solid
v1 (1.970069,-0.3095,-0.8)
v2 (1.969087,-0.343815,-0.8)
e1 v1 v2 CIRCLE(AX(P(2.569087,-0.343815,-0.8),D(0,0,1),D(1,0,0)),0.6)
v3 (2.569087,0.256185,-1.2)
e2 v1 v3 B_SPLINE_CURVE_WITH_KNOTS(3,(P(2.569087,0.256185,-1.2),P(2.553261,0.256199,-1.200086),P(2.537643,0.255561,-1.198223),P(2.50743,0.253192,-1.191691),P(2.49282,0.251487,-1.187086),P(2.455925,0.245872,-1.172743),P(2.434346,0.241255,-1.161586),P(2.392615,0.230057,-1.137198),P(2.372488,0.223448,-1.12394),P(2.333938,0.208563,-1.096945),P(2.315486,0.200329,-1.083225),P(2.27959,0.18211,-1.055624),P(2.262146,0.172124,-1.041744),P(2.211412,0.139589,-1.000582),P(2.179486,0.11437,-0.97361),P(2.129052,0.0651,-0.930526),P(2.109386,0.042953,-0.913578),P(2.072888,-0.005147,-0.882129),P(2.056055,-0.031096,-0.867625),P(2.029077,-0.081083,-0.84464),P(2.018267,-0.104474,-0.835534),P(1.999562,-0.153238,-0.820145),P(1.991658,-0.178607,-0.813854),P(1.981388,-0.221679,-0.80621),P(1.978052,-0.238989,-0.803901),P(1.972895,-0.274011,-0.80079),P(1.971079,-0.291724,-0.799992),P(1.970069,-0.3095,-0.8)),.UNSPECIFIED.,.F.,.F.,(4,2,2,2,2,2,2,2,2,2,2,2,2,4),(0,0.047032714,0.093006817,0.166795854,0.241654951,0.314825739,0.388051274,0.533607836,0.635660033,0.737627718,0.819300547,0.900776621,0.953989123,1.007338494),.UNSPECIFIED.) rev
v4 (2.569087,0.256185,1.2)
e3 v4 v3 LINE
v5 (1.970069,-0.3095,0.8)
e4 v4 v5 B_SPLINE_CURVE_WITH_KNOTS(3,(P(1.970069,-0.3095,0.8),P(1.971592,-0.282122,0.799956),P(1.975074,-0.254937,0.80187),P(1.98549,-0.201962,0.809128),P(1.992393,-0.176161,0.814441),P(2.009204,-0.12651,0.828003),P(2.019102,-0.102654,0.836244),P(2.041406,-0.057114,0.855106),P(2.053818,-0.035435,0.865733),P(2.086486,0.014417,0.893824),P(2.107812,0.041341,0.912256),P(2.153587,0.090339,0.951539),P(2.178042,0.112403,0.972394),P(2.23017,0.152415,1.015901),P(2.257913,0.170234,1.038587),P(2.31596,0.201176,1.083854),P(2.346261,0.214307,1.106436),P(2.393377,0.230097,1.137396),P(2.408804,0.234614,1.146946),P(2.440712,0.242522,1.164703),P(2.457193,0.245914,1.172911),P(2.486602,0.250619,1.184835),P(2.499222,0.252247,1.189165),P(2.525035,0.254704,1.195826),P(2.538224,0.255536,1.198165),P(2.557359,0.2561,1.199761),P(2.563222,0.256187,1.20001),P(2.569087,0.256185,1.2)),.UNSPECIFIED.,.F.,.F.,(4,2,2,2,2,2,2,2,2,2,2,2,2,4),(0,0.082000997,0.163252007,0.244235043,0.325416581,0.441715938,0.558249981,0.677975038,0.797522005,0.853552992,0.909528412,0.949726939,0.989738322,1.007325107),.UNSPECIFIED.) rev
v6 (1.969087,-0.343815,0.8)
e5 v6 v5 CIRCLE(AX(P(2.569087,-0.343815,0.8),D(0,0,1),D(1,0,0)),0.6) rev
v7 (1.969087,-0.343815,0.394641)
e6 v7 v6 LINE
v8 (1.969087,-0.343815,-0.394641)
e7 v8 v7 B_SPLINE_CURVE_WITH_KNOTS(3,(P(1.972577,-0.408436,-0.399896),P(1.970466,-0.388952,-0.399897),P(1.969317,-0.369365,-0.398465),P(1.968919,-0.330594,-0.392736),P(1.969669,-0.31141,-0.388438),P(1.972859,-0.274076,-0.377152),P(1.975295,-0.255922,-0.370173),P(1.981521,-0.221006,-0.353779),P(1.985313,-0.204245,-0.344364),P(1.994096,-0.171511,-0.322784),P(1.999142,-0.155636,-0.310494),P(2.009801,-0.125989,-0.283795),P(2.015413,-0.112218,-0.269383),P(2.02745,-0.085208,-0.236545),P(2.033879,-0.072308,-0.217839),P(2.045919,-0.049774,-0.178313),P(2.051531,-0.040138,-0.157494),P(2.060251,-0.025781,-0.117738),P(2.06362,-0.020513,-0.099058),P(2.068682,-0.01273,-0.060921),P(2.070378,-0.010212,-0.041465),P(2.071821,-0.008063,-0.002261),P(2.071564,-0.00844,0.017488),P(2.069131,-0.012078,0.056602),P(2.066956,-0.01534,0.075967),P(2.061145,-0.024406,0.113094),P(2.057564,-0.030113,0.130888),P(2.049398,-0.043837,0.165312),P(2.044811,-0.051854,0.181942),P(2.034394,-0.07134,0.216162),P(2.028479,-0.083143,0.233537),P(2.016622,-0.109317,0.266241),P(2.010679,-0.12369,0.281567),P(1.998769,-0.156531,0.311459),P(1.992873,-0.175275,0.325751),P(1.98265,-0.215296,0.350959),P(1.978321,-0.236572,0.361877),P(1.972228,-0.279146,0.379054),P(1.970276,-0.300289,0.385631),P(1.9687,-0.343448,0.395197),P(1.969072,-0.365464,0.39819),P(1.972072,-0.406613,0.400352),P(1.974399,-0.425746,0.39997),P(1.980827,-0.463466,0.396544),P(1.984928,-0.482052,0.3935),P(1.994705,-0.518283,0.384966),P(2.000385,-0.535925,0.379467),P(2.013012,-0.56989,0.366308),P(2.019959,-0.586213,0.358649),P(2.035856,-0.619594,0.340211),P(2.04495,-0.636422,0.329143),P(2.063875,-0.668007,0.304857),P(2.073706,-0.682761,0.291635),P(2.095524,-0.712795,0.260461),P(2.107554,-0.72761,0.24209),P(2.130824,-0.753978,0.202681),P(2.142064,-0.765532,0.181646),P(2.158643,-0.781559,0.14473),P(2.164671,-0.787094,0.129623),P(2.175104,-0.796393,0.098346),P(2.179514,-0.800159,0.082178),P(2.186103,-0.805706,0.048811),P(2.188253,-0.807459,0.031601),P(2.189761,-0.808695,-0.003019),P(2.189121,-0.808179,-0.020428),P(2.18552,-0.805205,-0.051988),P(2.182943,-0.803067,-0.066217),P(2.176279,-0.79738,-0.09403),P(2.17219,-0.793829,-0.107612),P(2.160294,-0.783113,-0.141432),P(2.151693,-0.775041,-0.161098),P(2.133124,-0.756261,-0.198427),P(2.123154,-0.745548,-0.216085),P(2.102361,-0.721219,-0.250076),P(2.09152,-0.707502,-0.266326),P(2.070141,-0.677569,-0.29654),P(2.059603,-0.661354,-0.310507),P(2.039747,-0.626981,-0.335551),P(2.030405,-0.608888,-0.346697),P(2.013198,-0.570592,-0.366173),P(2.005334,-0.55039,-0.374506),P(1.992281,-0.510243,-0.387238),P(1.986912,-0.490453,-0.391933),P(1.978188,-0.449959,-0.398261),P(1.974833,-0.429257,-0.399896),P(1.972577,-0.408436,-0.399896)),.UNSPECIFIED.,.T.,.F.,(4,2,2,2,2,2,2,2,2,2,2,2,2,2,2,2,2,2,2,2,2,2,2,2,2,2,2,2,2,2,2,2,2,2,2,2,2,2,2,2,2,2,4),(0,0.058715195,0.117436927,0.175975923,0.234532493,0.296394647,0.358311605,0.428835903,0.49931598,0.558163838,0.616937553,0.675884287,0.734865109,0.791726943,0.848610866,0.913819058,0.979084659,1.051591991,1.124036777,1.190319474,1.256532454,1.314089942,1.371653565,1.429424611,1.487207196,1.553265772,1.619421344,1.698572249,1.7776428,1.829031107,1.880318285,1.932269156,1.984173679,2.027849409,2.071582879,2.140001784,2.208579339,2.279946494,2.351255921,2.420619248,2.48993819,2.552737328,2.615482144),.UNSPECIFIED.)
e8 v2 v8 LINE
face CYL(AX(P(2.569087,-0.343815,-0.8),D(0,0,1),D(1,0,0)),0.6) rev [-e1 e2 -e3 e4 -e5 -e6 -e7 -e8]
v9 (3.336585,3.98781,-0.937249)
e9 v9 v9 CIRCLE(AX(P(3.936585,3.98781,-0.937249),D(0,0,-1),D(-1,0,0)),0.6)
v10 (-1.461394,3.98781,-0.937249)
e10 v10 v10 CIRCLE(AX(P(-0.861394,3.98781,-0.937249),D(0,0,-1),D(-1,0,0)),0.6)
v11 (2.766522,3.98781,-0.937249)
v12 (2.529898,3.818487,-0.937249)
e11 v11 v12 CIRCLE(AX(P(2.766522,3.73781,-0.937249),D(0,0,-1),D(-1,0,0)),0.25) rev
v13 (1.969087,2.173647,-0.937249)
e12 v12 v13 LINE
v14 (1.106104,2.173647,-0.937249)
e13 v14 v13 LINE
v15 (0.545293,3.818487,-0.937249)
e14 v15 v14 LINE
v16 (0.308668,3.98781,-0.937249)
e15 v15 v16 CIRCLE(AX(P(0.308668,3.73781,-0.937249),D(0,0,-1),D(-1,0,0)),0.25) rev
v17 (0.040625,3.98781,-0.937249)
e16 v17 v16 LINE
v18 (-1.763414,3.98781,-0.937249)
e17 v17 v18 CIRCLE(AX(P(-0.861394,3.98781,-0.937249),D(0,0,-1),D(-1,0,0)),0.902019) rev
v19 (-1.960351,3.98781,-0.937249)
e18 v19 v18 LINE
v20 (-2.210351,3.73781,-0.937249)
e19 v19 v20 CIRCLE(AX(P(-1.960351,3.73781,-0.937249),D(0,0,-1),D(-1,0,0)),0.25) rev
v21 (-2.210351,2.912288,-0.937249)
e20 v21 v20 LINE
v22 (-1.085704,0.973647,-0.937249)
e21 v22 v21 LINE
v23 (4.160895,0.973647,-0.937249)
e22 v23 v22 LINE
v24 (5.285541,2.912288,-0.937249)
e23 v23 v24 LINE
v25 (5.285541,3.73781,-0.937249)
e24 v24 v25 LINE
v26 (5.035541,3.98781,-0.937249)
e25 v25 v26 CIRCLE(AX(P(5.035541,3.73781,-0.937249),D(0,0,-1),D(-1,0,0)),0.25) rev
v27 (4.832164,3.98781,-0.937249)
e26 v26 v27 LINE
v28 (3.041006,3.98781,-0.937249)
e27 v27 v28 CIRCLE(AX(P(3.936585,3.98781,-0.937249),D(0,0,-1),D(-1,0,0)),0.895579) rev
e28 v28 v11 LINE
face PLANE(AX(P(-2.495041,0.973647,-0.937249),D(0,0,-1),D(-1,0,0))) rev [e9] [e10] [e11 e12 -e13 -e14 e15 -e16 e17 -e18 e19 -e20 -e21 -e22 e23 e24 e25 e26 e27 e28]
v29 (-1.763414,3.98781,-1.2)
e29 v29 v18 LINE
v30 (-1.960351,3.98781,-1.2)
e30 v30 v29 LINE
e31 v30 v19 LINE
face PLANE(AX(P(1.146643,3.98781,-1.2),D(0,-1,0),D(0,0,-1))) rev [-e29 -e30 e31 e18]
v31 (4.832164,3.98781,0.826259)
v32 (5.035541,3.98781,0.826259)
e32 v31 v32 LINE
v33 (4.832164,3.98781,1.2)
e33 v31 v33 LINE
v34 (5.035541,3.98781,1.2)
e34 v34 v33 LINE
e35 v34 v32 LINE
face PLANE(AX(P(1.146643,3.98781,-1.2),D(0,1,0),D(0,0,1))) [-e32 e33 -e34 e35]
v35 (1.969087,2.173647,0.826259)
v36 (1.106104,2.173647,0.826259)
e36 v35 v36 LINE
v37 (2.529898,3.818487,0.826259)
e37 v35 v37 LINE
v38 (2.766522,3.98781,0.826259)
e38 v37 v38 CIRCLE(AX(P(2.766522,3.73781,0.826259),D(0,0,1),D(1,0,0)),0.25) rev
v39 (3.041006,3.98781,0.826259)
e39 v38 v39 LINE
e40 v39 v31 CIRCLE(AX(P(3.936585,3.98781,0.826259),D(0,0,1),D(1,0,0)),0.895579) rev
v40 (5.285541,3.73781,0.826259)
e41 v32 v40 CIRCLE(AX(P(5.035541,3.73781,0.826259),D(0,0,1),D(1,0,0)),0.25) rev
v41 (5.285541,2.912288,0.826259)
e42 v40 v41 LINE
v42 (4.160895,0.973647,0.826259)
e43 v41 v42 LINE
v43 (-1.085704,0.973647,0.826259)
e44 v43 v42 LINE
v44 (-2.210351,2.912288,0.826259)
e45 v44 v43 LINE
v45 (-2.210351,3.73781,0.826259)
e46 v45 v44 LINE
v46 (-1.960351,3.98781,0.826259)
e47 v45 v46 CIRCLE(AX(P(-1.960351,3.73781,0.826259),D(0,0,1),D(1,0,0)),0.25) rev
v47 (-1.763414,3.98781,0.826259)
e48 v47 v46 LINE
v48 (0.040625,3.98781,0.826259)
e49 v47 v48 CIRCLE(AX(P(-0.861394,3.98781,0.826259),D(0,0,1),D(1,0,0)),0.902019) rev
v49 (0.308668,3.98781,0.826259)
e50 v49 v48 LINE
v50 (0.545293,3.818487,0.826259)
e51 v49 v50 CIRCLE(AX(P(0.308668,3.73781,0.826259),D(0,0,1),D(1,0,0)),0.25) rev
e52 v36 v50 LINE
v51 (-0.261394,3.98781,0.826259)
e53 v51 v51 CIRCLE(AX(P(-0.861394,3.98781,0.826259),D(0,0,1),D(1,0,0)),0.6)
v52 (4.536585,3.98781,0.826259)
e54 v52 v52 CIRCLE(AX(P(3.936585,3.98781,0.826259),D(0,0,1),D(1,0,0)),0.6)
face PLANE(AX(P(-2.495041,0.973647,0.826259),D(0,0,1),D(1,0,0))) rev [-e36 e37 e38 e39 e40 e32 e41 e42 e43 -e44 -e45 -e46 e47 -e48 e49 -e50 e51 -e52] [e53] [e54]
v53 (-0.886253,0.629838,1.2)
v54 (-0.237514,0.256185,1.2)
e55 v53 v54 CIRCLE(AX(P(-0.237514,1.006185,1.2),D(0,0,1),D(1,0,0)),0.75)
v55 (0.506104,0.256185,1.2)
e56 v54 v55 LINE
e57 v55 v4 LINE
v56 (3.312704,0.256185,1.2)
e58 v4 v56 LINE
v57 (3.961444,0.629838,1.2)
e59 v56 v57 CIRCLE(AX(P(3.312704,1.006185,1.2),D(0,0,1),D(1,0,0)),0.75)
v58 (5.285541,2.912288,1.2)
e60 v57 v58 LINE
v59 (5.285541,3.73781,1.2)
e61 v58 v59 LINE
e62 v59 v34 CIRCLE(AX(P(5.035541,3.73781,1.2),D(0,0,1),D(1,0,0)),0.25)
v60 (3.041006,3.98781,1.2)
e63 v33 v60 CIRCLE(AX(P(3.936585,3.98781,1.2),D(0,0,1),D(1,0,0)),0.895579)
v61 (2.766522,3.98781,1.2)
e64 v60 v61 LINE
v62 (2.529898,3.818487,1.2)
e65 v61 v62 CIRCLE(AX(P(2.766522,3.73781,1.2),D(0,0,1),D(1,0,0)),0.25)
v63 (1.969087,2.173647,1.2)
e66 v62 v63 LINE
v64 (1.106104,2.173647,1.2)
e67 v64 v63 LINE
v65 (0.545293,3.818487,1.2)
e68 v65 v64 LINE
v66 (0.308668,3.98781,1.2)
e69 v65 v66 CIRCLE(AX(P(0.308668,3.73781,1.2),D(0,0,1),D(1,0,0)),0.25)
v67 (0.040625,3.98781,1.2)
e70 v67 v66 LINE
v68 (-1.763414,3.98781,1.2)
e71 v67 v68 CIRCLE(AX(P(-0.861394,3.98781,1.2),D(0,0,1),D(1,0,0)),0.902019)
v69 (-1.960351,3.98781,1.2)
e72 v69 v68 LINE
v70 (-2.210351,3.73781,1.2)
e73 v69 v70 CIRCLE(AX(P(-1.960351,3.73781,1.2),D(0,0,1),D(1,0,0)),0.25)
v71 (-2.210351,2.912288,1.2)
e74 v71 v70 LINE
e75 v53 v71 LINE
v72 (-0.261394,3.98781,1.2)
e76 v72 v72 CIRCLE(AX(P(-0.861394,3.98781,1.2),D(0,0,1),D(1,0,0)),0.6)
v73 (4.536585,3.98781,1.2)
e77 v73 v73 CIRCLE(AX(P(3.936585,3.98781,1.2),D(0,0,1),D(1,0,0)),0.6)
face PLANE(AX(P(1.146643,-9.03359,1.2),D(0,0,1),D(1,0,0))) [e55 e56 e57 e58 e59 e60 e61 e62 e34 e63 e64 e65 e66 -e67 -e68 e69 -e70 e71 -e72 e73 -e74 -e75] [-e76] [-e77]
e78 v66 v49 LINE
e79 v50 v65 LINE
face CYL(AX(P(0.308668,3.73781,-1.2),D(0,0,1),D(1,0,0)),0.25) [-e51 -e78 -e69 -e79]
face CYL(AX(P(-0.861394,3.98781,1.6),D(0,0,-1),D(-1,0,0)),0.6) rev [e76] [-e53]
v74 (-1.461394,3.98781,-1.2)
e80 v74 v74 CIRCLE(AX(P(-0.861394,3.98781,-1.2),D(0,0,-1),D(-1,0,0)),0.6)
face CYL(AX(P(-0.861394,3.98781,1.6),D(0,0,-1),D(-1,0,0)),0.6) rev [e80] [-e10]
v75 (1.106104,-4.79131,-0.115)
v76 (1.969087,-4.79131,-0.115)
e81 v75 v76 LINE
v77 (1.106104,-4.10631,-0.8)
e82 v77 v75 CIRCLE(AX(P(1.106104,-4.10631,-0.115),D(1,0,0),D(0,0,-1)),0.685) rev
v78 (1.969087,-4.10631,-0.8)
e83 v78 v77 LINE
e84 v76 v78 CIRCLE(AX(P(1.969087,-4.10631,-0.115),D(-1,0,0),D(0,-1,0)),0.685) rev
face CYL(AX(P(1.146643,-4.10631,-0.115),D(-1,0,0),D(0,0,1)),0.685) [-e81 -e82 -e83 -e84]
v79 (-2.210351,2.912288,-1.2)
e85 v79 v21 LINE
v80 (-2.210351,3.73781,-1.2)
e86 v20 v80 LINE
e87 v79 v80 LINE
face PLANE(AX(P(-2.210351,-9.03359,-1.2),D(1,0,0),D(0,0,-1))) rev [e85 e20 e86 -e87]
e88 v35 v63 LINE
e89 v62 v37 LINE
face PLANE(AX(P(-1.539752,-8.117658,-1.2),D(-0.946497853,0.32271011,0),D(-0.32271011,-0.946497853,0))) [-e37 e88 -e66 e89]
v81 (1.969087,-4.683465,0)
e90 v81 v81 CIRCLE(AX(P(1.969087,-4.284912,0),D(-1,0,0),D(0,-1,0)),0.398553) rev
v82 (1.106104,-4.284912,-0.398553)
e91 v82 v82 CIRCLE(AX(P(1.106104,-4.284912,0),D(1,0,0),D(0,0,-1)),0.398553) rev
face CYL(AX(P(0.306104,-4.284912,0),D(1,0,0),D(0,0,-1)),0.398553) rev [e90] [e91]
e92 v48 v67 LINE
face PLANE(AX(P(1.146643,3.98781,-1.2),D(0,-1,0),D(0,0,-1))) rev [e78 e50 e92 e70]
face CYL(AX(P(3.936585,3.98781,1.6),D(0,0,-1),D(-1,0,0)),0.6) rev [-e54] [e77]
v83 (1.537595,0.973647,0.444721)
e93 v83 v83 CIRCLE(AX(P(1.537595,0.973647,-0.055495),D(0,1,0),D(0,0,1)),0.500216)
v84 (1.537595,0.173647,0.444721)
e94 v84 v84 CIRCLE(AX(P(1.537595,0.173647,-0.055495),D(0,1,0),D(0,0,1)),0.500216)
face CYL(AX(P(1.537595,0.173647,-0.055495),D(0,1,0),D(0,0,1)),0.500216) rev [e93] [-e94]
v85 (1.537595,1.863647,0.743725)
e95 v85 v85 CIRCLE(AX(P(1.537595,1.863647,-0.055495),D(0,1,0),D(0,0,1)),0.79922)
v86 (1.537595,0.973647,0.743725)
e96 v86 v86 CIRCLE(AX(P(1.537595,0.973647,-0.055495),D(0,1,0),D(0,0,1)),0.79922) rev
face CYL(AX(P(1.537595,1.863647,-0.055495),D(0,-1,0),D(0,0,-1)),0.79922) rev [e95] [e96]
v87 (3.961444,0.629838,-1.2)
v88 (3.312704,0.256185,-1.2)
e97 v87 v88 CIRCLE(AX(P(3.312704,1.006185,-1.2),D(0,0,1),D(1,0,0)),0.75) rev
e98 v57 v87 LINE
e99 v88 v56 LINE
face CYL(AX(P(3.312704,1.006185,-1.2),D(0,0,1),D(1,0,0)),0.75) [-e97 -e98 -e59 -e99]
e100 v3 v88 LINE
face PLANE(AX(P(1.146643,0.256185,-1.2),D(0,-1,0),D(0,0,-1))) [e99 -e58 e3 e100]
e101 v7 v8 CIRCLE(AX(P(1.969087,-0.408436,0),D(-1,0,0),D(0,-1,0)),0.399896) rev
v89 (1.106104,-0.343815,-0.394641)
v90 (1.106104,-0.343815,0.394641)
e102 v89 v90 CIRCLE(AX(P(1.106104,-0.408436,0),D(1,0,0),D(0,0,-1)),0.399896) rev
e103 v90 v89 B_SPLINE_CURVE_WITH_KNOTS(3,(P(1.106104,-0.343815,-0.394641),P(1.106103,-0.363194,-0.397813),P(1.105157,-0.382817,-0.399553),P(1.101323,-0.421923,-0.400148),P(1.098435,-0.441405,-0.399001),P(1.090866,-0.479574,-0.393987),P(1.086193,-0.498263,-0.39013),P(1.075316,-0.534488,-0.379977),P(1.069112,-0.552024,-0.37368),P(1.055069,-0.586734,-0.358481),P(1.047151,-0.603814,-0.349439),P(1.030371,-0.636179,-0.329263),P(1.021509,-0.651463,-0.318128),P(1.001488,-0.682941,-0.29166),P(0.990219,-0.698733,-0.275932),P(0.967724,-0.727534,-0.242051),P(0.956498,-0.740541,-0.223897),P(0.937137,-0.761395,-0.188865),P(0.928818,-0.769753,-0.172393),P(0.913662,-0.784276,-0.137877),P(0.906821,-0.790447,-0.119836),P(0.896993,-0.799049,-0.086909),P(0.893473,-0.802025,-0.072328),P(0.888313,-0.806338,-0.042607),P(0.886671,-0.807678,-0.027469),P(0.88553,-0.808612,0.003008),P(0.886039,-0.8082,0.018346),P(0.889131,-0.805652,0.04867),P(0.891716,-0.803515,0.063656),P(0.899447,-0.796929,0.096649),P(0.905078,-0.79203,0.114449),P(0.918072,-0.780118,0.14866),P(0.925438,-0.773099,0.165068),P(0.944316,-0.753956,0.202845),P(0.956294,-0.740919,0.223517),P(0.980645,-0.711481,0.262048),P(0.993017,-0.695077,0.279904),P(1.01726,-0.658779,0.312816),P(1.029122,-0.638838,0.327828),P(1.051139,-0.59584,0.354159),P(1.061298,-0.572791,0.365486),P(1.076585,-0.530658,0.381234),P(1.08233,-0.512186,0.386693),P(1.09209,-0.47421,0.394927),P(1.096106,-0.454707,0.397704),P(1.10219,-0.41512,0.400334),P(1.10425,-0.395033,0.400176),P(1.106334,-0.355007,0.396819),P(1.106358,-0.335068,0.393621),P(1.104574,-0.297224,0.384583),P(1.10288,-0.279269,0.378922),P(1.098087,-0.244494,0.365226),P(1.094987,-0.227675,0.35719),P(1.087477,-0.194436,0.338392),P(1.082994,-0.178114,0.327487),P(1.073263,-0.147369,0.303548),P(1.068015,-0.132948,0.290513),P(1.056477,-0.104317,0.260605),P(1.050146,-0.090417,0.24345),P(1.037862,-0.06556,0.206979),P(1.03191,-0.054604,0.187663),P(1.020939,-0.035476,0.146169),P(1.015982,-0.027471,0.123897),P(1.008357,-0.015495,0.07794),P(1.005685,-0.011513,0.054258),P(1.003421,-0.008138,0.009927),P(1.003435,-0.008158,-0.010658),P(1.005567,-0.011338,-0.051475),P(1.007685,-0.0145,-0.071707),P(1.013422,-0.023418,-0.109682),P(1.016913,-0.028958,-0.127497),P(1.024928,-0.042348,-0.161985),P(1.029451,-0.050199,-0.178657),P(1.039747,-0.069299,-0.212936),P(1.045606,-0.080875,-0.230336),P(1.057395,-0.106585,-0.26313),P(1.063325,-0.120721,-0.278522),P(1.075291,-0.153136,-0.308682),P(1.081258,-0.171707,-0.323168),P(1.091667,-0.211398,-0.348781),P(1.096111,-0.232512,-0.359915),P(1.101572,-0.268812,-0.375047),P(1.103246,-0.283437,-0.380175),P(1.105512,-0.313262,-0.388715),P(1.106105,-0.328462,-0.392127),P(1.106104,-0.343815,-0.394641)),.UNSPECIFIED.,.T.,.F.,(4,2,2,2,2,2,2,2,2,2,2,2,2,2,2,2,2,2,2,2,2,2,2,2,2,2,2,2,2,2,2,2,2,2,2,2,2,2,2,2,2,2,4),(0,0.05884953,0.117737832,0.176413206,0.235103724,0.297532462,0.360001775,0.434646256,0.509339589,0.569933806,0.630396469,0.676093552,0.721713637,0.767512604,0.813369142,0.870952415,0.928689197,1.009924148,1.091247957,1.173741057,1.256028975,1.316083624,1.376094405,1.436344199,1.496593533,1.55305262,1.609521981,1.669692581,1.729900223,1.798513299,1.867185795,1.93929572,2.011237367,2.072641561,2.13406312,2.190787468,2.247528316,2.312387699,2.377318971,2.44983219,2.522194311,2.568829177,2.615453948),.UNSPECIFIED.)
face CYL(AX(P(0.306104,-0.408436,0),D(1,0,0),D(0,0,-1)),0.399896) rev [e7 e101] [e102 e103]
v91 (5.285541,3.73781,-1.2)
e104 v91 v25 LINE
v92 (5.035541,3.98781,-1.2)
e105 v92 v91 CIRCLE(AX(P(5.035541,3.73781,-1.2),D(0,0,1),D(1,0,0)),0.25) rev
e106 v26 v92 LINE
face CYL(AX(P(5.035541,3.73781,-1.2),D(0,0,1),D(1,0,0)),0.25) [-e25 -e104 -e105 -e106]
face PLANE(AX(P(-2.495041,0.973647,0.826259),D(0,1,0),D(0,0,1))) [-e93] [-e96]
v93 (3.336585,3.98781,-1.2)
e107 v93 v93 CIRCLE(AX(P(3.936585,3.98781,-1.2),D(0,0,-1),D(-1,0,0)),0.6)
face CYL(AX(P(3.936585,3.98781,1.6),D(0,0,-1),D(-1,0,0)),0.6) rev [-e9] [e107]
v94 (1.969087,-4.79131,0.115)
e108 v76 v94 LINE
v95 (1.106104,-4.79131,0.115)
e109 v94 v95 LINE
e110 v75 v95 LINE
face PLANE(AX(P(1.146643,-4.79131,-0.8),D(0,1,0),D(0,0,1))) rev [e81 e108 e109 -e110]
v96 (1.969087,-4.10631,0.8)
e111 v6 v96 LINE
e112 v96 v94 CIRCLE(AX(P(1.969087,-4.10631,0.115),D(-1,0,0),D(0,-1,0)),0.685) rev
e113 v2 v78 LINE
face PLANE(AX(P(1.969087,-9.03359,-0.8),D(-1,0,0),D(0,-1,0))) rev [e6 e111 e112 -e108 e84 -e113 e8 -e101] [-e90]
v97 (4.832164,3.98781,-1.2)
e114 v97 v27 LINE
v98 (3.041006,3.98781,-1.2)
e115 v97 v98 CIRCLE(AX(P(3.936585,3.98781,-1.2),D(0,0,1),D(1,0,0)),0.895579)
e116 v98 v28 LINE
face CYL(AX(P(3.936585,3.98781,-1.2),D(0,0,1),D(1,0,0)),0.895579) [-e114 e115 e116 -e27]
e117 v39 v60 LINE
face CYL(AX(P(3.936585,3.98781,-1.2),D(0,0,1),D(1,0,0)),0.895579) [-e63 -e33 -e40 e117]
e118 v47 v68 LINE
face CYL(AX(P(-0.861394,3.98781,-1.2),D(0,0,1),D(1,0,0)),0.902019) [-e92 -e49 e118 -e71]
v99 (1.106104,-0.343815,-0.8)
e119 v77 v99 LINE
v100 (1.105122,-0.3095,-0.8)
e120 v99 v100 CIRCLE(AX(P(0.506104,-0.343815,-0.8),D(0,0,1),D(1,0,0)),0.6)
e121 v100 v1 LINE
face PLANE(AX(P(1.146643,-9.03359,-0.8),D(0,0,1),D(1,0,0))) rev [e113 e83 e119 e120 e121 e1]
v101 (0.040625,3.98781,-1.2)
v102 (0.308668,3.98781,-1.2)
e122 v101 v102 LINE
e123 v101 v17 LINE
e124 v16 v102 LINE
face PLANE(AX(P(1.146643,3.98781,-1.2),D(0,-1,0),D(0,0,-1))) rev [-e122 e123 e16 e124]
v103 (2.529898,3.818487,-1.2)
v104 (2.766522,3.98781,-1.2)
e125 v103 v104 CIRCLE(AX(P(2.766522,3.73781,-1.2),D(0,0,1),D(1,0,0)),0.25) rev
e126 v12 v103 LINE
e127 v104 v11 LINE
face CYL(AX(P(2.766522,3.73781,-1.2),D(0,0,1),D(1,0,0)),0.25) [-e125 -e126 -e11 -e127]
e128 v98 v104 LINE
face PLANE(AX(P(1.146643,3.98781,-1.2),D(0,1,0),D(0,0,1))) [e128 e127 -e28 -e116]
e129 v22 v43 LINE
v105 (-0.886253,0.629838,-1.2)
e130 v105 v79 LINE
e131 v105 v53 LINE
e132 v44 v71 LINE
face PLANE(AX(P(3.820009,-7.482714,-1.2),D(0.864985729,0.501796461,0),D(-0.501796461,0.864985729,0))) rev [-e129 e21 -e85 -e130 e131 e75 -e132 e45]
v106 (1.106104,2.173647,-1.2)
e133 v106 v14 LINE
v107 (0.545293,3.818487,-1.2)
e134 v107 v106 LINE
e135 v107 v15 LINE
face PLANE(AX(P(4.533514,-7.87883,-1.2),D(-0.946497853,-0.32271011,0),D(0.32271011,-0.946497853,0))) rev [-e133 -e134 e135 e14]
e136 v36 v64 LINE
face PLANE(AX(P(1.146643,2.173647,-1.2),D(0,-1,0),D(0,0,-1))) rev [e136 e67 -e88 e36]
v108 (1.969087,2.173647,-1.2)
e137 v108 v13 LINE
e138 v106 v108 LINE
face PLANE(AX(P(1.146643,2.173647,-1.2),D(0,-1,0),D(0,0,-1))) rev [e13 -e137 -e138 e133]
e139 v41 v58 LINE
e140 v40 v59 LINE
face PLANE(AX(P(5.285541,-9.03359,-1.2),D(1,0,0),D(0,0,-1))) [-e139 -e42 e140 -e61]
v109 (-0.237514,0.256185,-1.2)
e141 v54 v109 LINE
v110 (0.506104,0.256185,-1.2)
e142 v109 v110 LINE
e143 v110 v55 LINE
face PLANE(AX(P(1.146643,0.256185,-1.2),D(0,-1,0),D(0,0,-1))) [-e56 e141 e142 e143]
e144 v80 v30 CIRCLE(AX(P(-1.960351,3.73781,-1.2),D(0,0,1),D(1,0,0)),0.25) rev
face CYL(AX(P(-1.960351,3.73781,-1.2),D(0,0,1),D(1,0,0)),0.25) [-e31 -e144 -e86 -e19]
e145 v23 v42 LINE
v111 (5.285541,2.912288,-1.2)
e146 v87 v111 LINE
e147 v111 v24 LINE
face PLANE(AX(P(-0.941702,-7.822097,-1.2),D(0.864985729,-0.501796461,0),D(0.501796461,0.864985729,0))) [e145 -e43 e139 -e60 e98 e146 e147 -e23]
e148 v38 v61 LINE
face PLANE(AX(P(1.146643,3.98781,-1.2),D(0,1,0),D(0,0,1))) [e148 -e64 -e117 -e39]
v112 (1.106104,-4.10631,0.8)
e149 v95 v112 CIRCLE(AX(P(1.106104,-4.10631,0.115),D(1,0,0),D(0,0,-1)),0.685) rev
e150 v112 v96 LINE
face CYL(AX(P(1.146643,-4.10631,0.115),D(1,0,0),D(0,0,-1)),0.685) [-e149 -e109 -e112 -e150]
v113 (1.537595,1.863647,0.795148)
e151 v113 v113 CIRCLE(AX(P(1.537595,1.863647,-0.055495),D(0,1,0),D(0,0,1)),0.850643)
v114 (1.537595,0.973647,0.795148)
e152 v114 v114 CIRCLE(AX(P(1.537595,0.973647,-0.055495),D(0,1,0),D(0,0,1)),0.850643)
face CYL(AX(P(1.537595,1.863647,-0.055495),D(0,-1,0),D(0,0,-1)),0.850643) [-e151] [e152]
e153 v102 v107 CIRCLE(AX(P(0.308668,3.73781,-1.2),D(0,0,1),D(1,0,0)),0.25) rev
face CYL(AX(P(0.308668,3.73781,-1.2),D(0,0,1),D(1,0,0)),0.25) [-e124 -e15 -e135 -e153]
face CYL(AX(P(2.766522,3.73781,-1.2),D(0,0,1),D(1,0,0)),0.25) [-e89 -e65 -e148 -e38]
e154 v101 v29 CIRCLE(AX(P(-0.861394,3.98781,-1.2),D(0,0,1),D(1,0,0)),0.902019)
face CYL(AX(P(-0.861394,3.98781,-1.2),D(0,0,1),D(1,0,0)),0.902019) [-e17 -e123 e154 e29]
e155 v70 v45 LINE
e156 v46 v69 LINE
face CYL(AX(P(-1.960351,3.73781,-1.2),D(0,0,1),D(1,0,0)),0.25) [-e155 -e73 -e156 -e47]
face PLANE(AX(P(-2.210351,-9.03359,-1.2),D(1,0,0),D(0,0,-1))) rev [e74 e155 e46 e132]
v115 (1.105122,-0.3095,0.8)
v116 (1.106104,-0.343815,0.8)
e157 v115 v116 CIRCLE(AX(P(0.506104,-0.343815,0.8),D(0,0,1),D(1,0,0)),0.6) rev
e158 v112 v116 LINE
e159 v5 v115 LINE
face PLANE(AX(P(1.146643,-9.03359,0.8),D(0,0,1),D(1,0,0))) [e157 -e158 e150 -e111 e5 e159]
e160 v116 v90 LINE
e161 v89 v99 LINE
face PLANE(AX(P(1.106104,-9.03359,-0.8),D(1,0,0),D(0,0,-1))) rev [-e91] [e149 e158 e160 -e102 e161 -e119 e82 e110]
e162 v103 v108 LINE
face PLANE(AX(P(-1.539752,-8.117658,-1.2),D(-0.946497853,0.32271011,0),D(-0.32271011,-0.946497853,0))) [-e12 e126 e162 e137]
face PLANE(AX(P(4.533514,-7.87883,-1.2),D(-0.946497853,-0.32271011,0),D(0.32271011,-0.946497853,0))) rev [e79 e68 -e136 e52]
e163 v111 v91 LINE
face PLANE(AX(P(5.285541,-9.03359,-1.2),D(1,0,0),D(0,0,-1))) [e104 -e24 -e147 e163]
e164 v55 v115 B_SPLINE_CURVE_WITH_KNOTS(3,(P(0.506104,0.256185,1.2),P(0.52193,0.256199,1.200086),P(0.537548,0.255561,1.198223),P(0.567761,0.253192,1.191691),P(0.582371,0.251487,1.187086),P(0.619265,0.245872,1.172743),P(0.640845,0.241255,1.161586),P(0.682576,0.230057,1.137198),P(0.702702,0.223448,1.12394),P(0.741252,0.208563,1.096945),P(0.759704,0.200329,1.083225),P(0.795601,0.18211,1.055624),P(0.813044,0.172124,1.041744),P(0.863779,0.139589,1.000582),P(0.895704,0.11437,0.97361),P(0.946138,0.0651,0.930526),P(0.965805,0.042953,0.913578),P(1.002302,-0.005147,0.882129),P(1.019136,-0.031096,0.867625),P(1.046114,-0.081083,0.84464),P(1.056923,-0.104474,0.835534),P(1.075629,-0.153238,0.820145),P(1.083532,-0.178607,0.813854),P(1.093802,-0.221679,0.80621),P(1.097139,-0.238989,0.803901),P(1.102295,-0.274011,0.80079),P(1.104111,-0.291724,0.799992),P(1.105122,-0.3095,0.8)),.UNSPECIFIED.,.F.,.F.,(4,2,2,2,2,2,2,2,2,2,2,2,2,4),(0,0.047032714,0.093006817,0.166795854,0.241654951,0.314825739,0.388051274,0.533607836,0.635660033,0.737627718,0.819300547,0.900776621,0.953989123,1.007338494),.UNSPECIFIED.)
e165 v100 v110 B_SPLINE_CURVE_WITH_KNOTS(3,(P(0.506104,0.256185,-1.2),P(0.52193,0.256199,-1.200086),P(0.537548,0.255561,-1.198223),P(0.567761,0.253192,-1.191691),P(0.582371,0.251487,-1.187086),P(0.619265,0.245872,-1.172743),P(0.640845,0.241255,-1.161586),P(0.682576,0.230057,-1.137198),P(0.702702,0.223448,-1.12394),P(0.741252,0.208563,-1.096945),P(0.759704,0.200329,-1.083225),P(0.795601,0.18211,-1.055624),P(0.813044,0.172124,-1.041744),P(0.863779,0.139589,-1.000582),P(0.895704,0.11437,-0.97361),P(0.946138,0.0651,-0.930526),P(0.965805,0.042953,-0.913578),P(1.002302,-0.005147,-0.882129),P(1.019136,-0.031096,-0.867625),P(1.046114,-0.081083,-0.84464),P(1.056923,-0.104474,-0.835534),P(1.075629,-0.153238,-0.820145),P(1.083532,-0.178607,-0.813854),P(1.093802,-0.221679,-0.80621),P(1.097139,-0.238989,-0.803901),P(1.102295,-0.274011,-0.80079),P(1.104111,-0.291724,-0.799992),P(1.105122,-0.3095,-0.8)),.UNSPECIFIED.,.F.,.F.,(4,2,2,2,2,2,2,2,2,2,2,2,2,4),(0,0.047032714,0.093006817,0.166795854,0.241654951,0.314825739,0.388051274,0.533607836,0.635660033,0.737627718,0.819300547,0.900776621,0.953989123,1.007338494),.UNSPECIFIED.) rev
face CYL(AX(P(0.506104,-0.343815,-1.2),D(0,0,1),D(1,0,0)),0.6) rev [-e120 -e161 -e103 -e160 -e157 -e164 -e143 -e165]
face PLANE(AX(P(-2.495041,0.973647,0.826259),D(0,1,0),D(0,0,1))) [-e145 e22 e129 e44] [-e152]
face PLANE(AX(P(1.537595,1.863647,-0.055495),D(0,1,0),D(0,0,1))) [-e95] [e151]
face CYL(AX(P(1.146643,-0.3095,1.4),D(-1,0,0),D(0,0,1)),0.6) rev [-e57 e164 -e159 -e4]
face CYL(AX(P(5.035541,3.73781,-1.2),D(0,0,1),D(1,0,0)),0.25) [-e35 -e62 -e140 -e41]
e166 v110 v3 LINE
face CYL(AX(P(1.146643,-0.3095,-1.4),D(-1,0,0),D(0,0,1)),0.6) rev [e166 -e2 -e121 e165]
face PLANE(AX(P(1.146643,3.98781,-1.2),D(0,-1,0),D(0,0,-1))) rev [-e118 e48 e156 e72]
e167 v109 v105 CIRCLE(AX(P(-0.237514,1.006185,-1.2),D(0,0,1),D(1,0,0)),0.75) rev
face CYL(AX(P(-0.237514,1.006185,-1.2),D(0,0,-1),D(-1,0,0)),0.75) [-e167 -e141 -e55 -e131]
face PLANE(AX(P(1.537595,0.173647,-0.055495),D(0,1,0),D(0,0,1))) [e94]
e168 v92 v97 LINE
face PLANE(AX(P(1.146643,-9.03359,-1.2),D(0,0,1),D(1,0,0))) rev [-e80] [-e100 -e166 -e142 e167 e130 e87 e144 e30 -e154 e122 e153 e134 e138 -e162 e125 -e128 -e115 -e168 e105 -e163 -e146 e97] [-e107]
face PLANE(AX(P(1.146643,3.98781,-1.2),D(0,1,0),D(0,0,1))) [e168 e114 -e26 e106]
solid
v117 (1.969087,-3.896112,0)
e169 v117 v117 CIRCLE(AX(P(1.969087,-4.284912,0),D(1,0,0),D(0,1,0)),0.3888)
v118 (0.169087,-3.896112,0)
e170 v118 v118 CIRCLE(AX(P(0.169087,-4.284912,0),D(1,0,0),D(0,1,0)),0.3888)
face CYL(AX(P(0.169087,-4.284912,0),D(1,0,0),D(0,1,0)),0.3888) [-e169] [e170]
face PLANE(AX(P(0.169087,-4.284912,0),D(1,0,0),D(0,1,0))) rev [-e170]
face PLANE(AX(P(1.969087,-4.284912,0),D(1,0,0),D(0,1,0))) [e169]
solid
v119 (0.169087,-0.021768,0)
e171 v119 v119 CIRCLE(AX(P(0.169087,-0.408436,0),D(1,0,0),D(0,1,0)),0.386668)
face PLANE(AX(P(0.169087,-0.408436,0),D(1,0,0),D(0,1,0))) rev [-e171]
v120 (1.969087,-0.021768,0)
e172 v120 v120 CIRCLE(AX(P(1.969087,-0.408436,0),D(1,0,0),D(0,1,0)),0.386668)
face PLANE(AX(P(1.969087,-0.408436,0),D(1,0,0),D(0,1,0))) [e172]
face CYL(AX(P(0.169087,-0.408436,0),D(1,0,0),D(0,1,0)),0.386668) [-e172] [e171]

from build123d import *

# Parameters (mm, degrees)
BOSS_EXTRU_1_DEPTH           = 1.2
BOSS_EXTRU_1_DEPTH_BACK      = 1.2
BOSS_EXTRU_3_DEPTH           = 0.8
BOSS_EXTRU_3_DEPTH_BACK      = 0.8
CONG_1_R                     = 0.6
ENL_V_MAT_EXTRU_1_DEPTH      = 0.8
ENL_V_MAT_EXTRU_1_DEPTH_BACK = 1.2
ESQUISSE3_R                  = 0.39855318391120886
ESQUISSE3_R_2                = 0.3998963443973292
ESQUISSE4_R                  = 0.388799523274085
BOSS_EXTRU_4_DEPTH           = 1.8
ESQUISSE4_R_2                = 0.3866675679352152
BOSS_EXTRU_4_2_DEPTH         = 1.8
ENL_V_MAT_EXTRU_2_DEPTH      = 2.8
ENL_V_MAT_EXTRU_2_DEPTH_BACK = 1.2
ESQUISSE5_W                  = 8.040608678581814
ESQUISSE5_H                  = 1.7635077316521461
ESQUISSE6_R                  = 0.5999999999999998
ENL_V_MAT_EXTRU_3_DEPTH      = 2.8
ESQUISSE7_R                  = 0.850642706215731
ESQUISSE7_R_2                = 0.7992203183173335
BOSS_EXTRU_5_DEPTH           = 0.89
ESQUISSE8_R                  = 0.5002156559531135
ENL_V_MAT_EXTRU_4_DEPTH      = 0.8
CONG_2_R                     = 0.75
CONG_3_R                     = 0.25
CONG_4_R                     = 0.685


with BuildPart() as part:
    # Esquisse1 → Boss.-Extru.1 (new, two sides: drawn at the far end of the back side and taken through both)
    with BuildSketch(Plane.XY.offset(-BOSS_EXTRU_1_DEPTH_BACK)):
        with BuildLine():
            Line((-0.669489396089797, 0.2561851906117251), (-2.2103508294642955, 2.912288317285255))
            Line((-2.2103508294642955, 2.912288317285255), (-2.2103508294642955, 3.987809597780656))
            Line((-2.2103508294642955, 3.987809597780656), (-1.7634137063925426, 3.987809597780656))
            ThreePointArc((-1.7634137063925426, 3.987809597780656), (-0.861394361103266, 4.889828943069933), (0.04062498418601097, 3.987809597780656))
            Line((0.04062498418601097, 3.987809597780656), (0.48756210725776383, 3.987809597780656))
            Line((0.48756210725776383, 3.987809597780656), (1.1061040002270477, 2.173647118407281))
            Line((1.1061040002270477, 2.173647118407281), (1.9690865158121553, 2.173647118407281))
            Line((1.9690865158121553, 2.173647118407281), (2.587628408781439, 3.987809597780656))
            Line((2.587628408781439, 3.987809597780656), (3.04100557345784, 3.987809597780656))
            ThreePointArc((3.04100557345784, 3.987809597780656), (3.9365848771424687, 4.883388901465285), (4.832164180827098, 3.987809597780656))
            Line((4.832164180827098, 3.987809597780656), (5.285541345503499, 3.987809597780656))
            Line((5.285541345503499, 3.987809597780656), (5.285541345503499, 2.912288317285255))
            Line((5.285541345503499, 2.912288317285255), (3.744679912129, 0.2561851906117251))
            Line((3.744679912129, 0.2561851906117251), (-0.669489396089797, 0.2561851906117251))
        make_face()
    extrude(amount=BOSS_EXTRU_1_DEPTH + BOSS_EXTRU_1_DEPTH_BACK)

    # Esquisse1<4> → Boss.-Extru.3 (add, two sides: drawn at the far end of the back side and taken through both)
    with BuildSketch(Plane.XY.offset(-BOSS_EXTRU_3_DEPTH_BACK)):
        Polygon((1.9690865158121553, 0.2561851906117251), (1.1061040002270477, 0.2561851906117251), (1.1061040002270477, 0), (1.1061040002270477, -4.485240552308376), (1.1061040002270477, -4.791310446559649), (1.9690865158121553, -4.791310446559649), (1.969086515812155, -3.887850080955423), (1.9690865158121553, -0.6623689479604176), (1.9690865158121544, 0.05202764865298772), align=None)
    extrude(amount=BOSS_EXTRU_3_DEPTH + BOSS_EXTRU_3_DEPTH_BACK)

    # Congé1
    # the kernel refuses this fillet: 0.6 mm, written as the material it adds along each edge
    with BuildSketch(Plane(origin=(1.1061040002270477, 0.2561851906117251, -0.8), x_dir=(-1, 0, 0), z_dir=(0, 0, 1))) as cong_1_piece_1:
        with BuildLine():
            CenterArc((CONG_1_R, CONG_1_R), CONG_1_R, 180, 90)
            Line((-2.2e-16, CONG_1_R), (-CONG_1_R * 0.02, CONG_1_R))
            Line((-CONG_1_R * 0.02, CONG_1_R), (-CONG_1_R * 0.02, -CONG_1_R * 0.02))
            Line((-CONG_1_R * 0.02, -CONG_1_R * 0.02), (CONG_1_R, -CONG_1_R * 0.02))
            Line((CONG_1_R, -CONG_1_R * 0.02), (CONG_1_R, 0))
        make_face()
    extrude(amount=1.6)
    with BuildSketch(Plane(origin=(1.9690865158121553, 0.2561851906117251, 0.8), x_dir=(0, 1.4e-16, 1), z_dir=(-1, 0, 0))) as cong_1_piece_2:
        with BuildLine():
            CenterArc((0.5999999999999998, -0.5656854249492381), CONG_1_R, 109.47122063449068, 70.52877936550932)
            Line((-1.9e-16, -0.565685424949238), (-0.0120000000000002, -0.565685424949238))
            Line((-0.0120000000000002, -0.565685424949238), (-0.01200000000000001, 0))
            Line((-0.01200000000000001, 0), (0, 0.01200000000000001))
            ThreePointArc((0, 0.01200000000000001), (0.19999999999999996, 0.01199999999999998), (0.3959999999999999, 0.01131370849898478))
            Line((0.3959999999999999, 0.01131370849898478), (0.3999999999999999, 0))
        make_face()
    extrude(amount=0.8629825155851076)
    with BuildSketch(Plane(origin=(1.9690865158121553, 0.2561851906117251, 0.8), x_dir=(1, 0, 0), z_dir=(0, 0, -1))) as cong_1_piece_3:
        with BuildLine():
            CenterArc((CONG_1_R, CONG_1_R), CONG_1_R, 180, 90)
            Line((-2.2e-16, CONG_1_R), (-CONG_1_R * 0.02, CONG_1_R))
            Line((-CONG_1_R * 0.02, CONG_1_R), (-CONG_1_R * 0.02, -CONG_1_R * 0.02))
            Line((-CONG_1_R * 0.02, -CONG_1_R * 0.02), (CONG_1_R, -CONG_1_R * 0.02))
            Line((CONG_1_R, -CONG_1_R * 0.02), (CONG_1_R, 0))
        make_face()
    extrude(amount=1.6)
    with BuildSketch(Plane(origin=(1.9690865158121553, 0.2561851906117251, -0.8), x_dir=(0, 1.4e-16, -1), z_dir=(-1, 0, 0))) as cong_1_piece_4:
        with BuildLine():
            CenterArc((0.5999999999999998, 0.5656854249492381), CONG_1_R, 180, 70.52877936550931)
            Line((-1.9e-16, 0.565685424949238), (-0.0120000000000002, 0.565685424949238))
            Line((-0.0120000000000002, 0.565685424949238), (-0.01200000000000001, 0))
            Line((-0.01200000000000001, 0), (0, -0.01200000000000001))
            ThreePointArc((0, -0.01200000000000001), (0.19999999999999996, -0.01199999999999998), (0.3959999999999999, -0.01131370849898478))
            Line((0.3959999999999999, -0.01131370849898478), (0.3999999999999999, 0))
        make_face()
    extrude(amount=0.8629825155851076)
    with BuildSketch(Plane(origin=(1.1061040002270475, 0.2561851906117251, -2.3), x_dir=(-1, 0, 0), z_dir=(0, 0, 1))) as cong_1_piece_5a_section:
        with BuildLine():
            CenterArc((CONG_1_R, CONG_1_R), CONG_1_R, 180, 90)
            Line((-4.4e-16, CONG_1_R), (-CONG_1_R * 0.02, CONG_1_R))
            Line((-CONG_1_R * 0.02, CONG_1_R), (-CONG_1_R * 0.02, -CONG_1_R * 0.02))
            Line((-CONG_1_R * 0.02, -CONG_1_R * 0.02), (CONG_1_R, -CONG_1_R * 0.02))
            Line((CONG_1_R, -CONG_1_R * 0.02), (CONG_1_R, 0))
        make_face()
    cong_1_piece_5a = extrude(amount=3.0999999999999996, mode=Mode.PRIVATE)
    cong_1_piece_5a = split(cong_1_piece_5a, bisect_by=Plane(origin=(0.9702669316669525, 0.12034812205163004, -1.2), z_dir=(0, 0, 1)), keep=Keep.TOP, mode=Mode.PRIVATE)
    cong_1_piece_5a = split(cong_1_piece_5a, bisect_by=Plane(origin=(0.9702669316669525, 0.12034812205163004, -0.8), z_dir=(0, 0, -1)), keep=Keep.TOP, mode=Mode.PRIVATE)
    with BuildSketch(Plane(origin=(1.9690865158121553, 0.2561851906117251, -0.8), x_dir=(0, 1.4e-16, -1), z_dir=(-1, 0, 0))) as cong_1_piece_5b_section:
        with BuildLine():
            CenterArc((0.5999999999999998, 0.5656854249492381), CONG_1_R, 180, 70.52877936550931)
            Line((-1.9e-16, 0.565685424949238), (-0.0120000000000002, 0.565685424949238))
            Line((-0.0120000000000002, 0.565685424949238), (-0.01200000000000001, 0))
            Line((-0.01200000000000001, 0), (0, -0.01200000000000001))
            ThreePointArc((0, -0.01200000000000001), (0.19999999999999996, -0.01199999999999998), (0.3959999999999999, -0.01131370849898478))
            Line((0.3959999999999999, -0.01131370849898478), (0.3999999999999999, 0))
        make_face()
    cong_1_piece_5b = extrude(amount=2.2771960779582026, mode=Mode.PRIVATE)
    cong_1_piece_5b = split(cong_1_piece_5b, bisect_by=Plane(origin=(1.1061040002270477, 0.12052150444088067, -0.9027063580397728), z_dir=(-1, 0, 0)), keep=Keep.TOP, mode=Mode.PRIVATE)
    cong_1_piece_5 = cong_1_piece_5a & cong_1_piece_5b
    add(cong_1_piece_5)
    with BuildSketch(Plane(origin=(1.9690865158121553, 0.2561851906117251, 0.8), x_dir=(0, 1.4e-16, 1), z_dir=(-1, 0, 0))) as cong_1_piece_6a_section:
        with BuildLine():
            CenterArc((0.5999999999999998, -0.5656854249492381), CONG_1_R, 109.47122063449068, 70.52877936550932)
            Line((-1.9e-16, -0.565685424949238), (-0.0120000000000002, -0.565685424949238))
            Line((-0.0120000000000002, -0.565685424949238), (-0.01200000000000001, 0))
            Line((-0.01200000000000001, 0), (0, 0.01200000000000001))
            ThreePointArc((0, 0.01200000000000001), (0.19999999999999996, 0.01199999999999998), (0.3959999999999999, 0.01131370849898478))
            Line((0.3959999999999999, 0.01131370849898478), (0.3999999999999999, 0))
        make_face()
    cong_1_piece_6a = extrude(amount=2.2771960779582026, mode=Mode.PRIVATE)
    cong_1_piece_6a = split(cong_1_piece_6a, bisect_by=Plane(origin=(1.1061040002270477, 0.12052150444088058, 0.9027063580397728), z_dir=(-1, 0, 0)), keep=Keep.TOP, mode=Mode.PRIVATE)
    with BuildSketch(Plane(origin=(1.1061040002270477, 0.2561851906117251, -0.8), x_dir=(-1, 0, 0), z_dir=(0, 0, 1))) as cong_1_piece_6b_section:
        with BuildLine():
            CenterArc((CONG_1_R, CONG_1_R), CONG_1_R, 180, 90)
            Line((-2.2e-16, CONG_1_R), (-CONG_1_R * 0.02, CONG_1_R))
            Line((-CONG_1_R * 0.02, CONG_1_R), (-CONG_1_R * 0.02, -CONG_1_R * 0.02))
            Line((-CONG_1_R * 0.02, -CONG_1_R * 0.02), (CONG_1_R, -CONG_1_R * 0.02))
            Line((CONG_1_R, -CONG_1_R * 0.02), (CONG_1_R, 0))
        make_face()
    cong_1_piece_6b = extrude(amount=3.0999999999999996, mode=Mode.PRIVATE)
    cong_1_piece_6b = split(cong_1_piece_6b, bisect_by=Plane(origin=(0.9702669316669524, 0.12034812205163004, 1.2), z_dir=(0, 0, -1)), keep=Keep.TOP, mode=Mode.PRIVATE)
    cong_1_piece_6b = split(cong_1_piece_6b, bisect_by=Plane(origin=(0.9702669316669524, 0.12034812205163004, 0.8), z_dir=(0, 0, 1)), keep=Keep.TOP, mode=Mode.PRIVATE)
    cong_1_piece_6 = cong_1_piece_6a & cong_1_piece_6b
    add(cong_1_piece_6)
    with BuildSketch(Plane(origin=(3.3833000781852505, 0.2561851906117251, 0.8), x_dir=(0, 1.4e-16, 1), z_dir=(-1, 0, 0))) as cong_1_piece_7a_section:
        with BuildLine():
            CenterArc((0.5999999999999998, -0.5656854249492381), CONG_1_R, 109.47122063449068, 70.52877936550932)
            Line((-1.9e-16, -0.565685424949238), (-0.0120000000000002, -0.565685424949238))
            Line((-0.0120000000000002, -0.565685424949238), (-0.01200000000000001, 0))
            Line((-0.01200000000000001, 0), (0, 0.01200000000000001))
            ThreePointArc((0, 0.01200000000000001), (0.19999999999999996, 0.01199999999999998), (0.3959999999999999, 0.01131370849898478))
            Line((0.3959999999999999, 0.01131370849898478), (0.3999999999999999, 0))
        make_face()
    cong_1_piece_7a = extrude(amount=2.2771960779582026, mode=Mode.PRIVATE)
    cong_1_piece_7a = split(cong_1_piece_7a, bisect_by=Plane(origin=(1.9690865158121542, 0.12052150444088383, 0.9027063580397718), z_dir=(1, 2.5e-16, 0)), keep=Keep.TOP, mode=Mode.PRIVATE)
    with BuildSketch(Plane(origin=(1.969086515812154, 0.2561851906117251, 2.3), x_dir=(1, 0, 0), z_dir=(0, 0, -1))) as cong_1_piece_7b_section:
        with BuildLine():
            CenterArc((CONG_1_R, CONG_1_R), CONG_1_R, 180, 90)
            Line((2.2e-16, CONG_1_R), (-CONG_1_R * 0.02, CONG_1_R))
            Line((-CONG_1_R * 0.02, CONG_1_R), (-CONG_1_R * 0.02, -CONG_1_R * 0.02))
            Line((-CONG_1_R * 0.02, -CONG_1_R * 0.02), (CONG_1_R, -CONG_1_R * 0.02))
            Line((CONG_1_R, -CONG_1_R * 0.02), (CONG_1_R, 0))
        make_face()
    cong_1_piece_7b = extrude(amount=3.0999999999999996, mode=Mode.PRIVATE)
    cong_1_piece_7b = split(cong_1_piece_7b, bisect_by=Plane(origin=(2.104923584372249, 0.12034812205162959, 1.2), z_dir=(0, 0, -1)), keep=Keep.TOP, mode=Mode.PRIVATE)
    cong_1_piece_7b = split(cong_1_piece_7b, bisect_by=Plane(origin=(2.104923584372249, 0.12034812205162959, 0.8), z_dir=(0, 0, 1)), keep=Keep.TOP, mode=Mode.PRIVATE)
    cong_1_piece_7 = cong_1_piece_7a & cong_1_piece_7b
    add(cong_1_piece_7)
    with BuildSketch(Plane(origin=(3.3833000781852505, 0.2561851906117251, -0.8), x_dir=(0, 1.4e-16, -1), z_dir=(-1, 0, 0))) as cong_1_piece_8a_section:
        with BuildLine():
            CenterArc((0.5999999999999998, 0.5656854249492381), CONG_1_R, 180, 70.52877936550931)
            Line((-1.9e-16, 0.565685424949238), (-0.0120000000000002, 0.565685424949238))
            Line((-0.0120000000000002, 0.565685424949238), (-0.01200000000000001, 0))
            Line((-0.01200000000000001, 0), (0, -0.01200000000000001))
            ThreePointArc((0, -0.01200000000000001), (0.19999999999999996, -0.01199999999999998), (0.3959999999999999, -0.01131370849898478))
            Line((0.3959999999999999, -0.01131370849898478), (0.3999999999999999, 0))
        make_face()
    cong_1_piece_8a = extrude(amount=2.2771960779582026, mode=Mode.PRIVATE)
    cong_1_piece_8a = split(cong_1_piece_8a, bisect_by=Plane(origin=(1.9690865158121542, 0.12052150444088383, -0.9027063580397665), z_dir=(1, 2.5e-16, 0)), keep=Keep.TOP, mode=Mode.PRIVATE)
    with BuildSketch(Plane(origin=(1.9690865158121553, 0.2561851906117251, 0.8), x_dir=(1, 0, 0), z_dir=(0, 0, -1))) as cong_1_piece_8b_section:
        with BuildLine():
            CenterArc((CONG_1_R, CONG_1_R), CONG_1_R, 180, 90)
            Line((-2.2e-16, CONG_1_R), (-CONG_1_R * 0.02, CONG_1_R))
            Line((-CONG_1_R * 0.02, CONG_1_R), (-CONG_1_R * 0.02, -CONG_1_R * 0.02))
            Line((-CONG_1_R * 0.02, -CONG_1_R * 0.02), (CONG_1_R, -CONG_1_R * 0.02))
            Line((CONG_1_R, -CONG_1_R * 0.02), (CONG_1_R, 0))
        make_face()
    cong_1_piece_8b = extrude(amount=3.0999999999999996, mode=Mode.PRIVATE)
    cong_1_piece_8b = split(cong_1_piece_8b, bisect_by=Plane(origin=(2.104923584372249, 0.12034812205162959, -1.2), z_dir=(0, 0, 1)), keep=Keep.TOP, mode=Mode.PRIVATE)
    cong_1_piece_8b = split(cong_1_piece_8b, bisect_by=Plane(origin=(2.104923584372249, 0.12034812205162959, -0.8), z_dir=(0, 0, -1)), keep=Keep.TOP, mode=Mode.PRIVATE)
    cong_1_piece_8 = cong_1_piece_8a & cong_1_piece_8b
    add(cong_1_piece_8)

    # Esquisse3 → Enlèv. mat.-Extru.1 (cut, two sides: drawn at the far end of the back side and taken through both)
    with BuildSketch(Plane.ZY.offset(-1.1061040002270477).offset(-ENL_V_MAT_EXTRU_1_DEPTH_BACK)):
        with Locations(Location((0, -4.284911622256936, 0), (0, 0, 180))):
            Circle(ESQUISSE3_R)
        with Locations(Location((0, -0.4084359374143761, 0), (0, 0, 170.700529822))):
            Circle(ESQUISSE3_R_2)
    extrude(amount=ENL_V_MAT_EXTRU_1_DEPTH + ENL_V_MAT_EXTRU_1_DEPTH_BACK, mode=Mode.SUBTRACT)

    # Esquisse5 → Enlèv. mat.-Extru.2 (cut, two sides: drawn at the far end of the back side and taken through both)
    with BuildSketch(Plane(origin=(0, 2.173647118407281, 0), x_dir=(1, 0, 0), z_dir=(0, 1, 0)).offset(-ENL_V_MAT_EXTRU_2_DEPTH_BACK)):
        with Locations((1.525263036119935, 0.05549499854850881)):
            Rectangle(ESQUISSE5_W, ESQUISSE5_H)
    extrude(amount=ENL_V_MAT_EXTRU_2_DEPTH + ENL_V_MAT_EXTRU_2_DEPTH_BACK, mode=Mode.SUBTRACT)

    # Esquisse6 → Enlèv. mat.-Extru.3 (cut)
    with BuildSketch(Plane(origin=(0, 0, -1.2), x_dir=(-1, 0, 0), z_dir=(0, 0, -1))):
        with Locations(Location((-3.9365848771424687, 3.987809597780656, 0), (0, 0, 180))):
            Circle(ESQUISSE6_R)
        with Locations(Location((0.861394361103266, 3.987809597780656, 0), (0, 0, 180))):
            Circle(ESQUISSE6_R)
    extrude(amount=-ENL_V_MAT_EXTRU_3_DEPTH, mode=Mode.SUBTRACT)

    # Esquisse7 → Boss.-Extru.5 (add)
    with BuildSketch(Plane(origin=(0, 0.9736471184072814, 0), x_dir=(1, 0, 0), z_dir=(0, 1, 0))):
        with Locations(Location((1.537595258019601, 0.05549499854850886, 0), (0, 0, 270))):
            Circle(ESQUISSE7_R)
        with Locations(Location((1.537595258019601, 0.05549499854850886, 0), (0, 0, 270))):
            Circle(ESQUISSE7_R_2, mode=Mode.SUBTRACT)
    extrude(amount=BOSS_EXTRU_5_DEPTH)

    # Esquisse8 → Enlèv. mat.-Extru.4 (cut)
    with BuildSketch(Plane(origin=(0, 0.9736471184072814, 0), x_dir=(1, 0, 0), z_dir=(0, 1, 0))):
        with Locations(Location((1.537595258019601, 0.05549499854850886, 0), (0, 0, 270))):
            Circle(ESQUISSE8_R)
    extrude(amount=-ENL_V_MAT_EXTRU_4_DEPTH, mode=Mode.SUBTRACT)

    # Congé2
    cong_2_edges = [part.edges().sort_by_distance(p)[0] for p in [
        (3.744679912129, 0.2561851906117251, 0),
        (-0.669489396089797, 0.2561851906117251, 0),
    ]]
    fillet(cong_2_edges, radius=CONG_2_R)

    # Congé3
    cong_3_edges = [part.edges().sort_by_distance(p)[0] for p in [
        (2.587628408781439, 3.987809597780656, 1.0131294336387822),
        (0.48756210725776383, 3.987809597780656, 1.013129433638782),
        (-2.2103508294642955, 3.987809597780656, 1.013129433638782),
        (5.285541345503499, 3.987809597780656, 1.013129433638782),
        (5.285541345503499, 3.987809597780656, -1.0686244321872909),
        (-2.2103508294642955, 3.987809597780656, -1.0686244321872909),
        (0.48756210725776383, 3.987809597780656, -1.0686244321872909),
        (2.587628408781439, 3.987809597780656, -1.0686244321872909),
    ]]
    fillet(cong_3_edges, radius=CONG_3_R)

    # Congé4
    cong_4_edges = [part.edges().sort_by_distance(p)[0] for p in [
        (1.5375952580196015, -4.791310446559649, 0.8),
        (1.5375952580196015, -4.791310446559649, -0.8),
    ]]
    fillet(cong_4_edges, radius=CONG_4_R)


with BuildPart() as body_2:
    # Esquisse4 → Boss.-Extru.4 (new body)
    with BuildSketch(Plane(origin=(1.9690865158121544, 3.5e-16, 0), x_dir=(0, 0, -1), z_dir=(1, 1.8e-16, 0))):
        with Locations(Location((0, -4.284911622256936, 0), (0, 0, 90))):
            Circle(ESQUISSE4_R)
    extrude(amount=-BOSS_EXTRU_4_DEPTH)


with BuildPart() as body_3:
    # Esquisse4 → Boss.-Extru.4 2 (new body)
    with BuildSketch(Plane(origin=(1.9690865158121544, 3.5e-16, 0), x_dir=(0, 0, -1), z_dir=(1, 1.8e-16, 0))):
        with Locations(Location((0, -0.4084359374143765, 0), (0, 0, 90))):
            Circle(ESQUISSE4_R_2)
    extrude(amount=-BOSS_EXTRU_4_2_DEPTH)


solid = Compound([part.part, body_2.part, body_3.part])
